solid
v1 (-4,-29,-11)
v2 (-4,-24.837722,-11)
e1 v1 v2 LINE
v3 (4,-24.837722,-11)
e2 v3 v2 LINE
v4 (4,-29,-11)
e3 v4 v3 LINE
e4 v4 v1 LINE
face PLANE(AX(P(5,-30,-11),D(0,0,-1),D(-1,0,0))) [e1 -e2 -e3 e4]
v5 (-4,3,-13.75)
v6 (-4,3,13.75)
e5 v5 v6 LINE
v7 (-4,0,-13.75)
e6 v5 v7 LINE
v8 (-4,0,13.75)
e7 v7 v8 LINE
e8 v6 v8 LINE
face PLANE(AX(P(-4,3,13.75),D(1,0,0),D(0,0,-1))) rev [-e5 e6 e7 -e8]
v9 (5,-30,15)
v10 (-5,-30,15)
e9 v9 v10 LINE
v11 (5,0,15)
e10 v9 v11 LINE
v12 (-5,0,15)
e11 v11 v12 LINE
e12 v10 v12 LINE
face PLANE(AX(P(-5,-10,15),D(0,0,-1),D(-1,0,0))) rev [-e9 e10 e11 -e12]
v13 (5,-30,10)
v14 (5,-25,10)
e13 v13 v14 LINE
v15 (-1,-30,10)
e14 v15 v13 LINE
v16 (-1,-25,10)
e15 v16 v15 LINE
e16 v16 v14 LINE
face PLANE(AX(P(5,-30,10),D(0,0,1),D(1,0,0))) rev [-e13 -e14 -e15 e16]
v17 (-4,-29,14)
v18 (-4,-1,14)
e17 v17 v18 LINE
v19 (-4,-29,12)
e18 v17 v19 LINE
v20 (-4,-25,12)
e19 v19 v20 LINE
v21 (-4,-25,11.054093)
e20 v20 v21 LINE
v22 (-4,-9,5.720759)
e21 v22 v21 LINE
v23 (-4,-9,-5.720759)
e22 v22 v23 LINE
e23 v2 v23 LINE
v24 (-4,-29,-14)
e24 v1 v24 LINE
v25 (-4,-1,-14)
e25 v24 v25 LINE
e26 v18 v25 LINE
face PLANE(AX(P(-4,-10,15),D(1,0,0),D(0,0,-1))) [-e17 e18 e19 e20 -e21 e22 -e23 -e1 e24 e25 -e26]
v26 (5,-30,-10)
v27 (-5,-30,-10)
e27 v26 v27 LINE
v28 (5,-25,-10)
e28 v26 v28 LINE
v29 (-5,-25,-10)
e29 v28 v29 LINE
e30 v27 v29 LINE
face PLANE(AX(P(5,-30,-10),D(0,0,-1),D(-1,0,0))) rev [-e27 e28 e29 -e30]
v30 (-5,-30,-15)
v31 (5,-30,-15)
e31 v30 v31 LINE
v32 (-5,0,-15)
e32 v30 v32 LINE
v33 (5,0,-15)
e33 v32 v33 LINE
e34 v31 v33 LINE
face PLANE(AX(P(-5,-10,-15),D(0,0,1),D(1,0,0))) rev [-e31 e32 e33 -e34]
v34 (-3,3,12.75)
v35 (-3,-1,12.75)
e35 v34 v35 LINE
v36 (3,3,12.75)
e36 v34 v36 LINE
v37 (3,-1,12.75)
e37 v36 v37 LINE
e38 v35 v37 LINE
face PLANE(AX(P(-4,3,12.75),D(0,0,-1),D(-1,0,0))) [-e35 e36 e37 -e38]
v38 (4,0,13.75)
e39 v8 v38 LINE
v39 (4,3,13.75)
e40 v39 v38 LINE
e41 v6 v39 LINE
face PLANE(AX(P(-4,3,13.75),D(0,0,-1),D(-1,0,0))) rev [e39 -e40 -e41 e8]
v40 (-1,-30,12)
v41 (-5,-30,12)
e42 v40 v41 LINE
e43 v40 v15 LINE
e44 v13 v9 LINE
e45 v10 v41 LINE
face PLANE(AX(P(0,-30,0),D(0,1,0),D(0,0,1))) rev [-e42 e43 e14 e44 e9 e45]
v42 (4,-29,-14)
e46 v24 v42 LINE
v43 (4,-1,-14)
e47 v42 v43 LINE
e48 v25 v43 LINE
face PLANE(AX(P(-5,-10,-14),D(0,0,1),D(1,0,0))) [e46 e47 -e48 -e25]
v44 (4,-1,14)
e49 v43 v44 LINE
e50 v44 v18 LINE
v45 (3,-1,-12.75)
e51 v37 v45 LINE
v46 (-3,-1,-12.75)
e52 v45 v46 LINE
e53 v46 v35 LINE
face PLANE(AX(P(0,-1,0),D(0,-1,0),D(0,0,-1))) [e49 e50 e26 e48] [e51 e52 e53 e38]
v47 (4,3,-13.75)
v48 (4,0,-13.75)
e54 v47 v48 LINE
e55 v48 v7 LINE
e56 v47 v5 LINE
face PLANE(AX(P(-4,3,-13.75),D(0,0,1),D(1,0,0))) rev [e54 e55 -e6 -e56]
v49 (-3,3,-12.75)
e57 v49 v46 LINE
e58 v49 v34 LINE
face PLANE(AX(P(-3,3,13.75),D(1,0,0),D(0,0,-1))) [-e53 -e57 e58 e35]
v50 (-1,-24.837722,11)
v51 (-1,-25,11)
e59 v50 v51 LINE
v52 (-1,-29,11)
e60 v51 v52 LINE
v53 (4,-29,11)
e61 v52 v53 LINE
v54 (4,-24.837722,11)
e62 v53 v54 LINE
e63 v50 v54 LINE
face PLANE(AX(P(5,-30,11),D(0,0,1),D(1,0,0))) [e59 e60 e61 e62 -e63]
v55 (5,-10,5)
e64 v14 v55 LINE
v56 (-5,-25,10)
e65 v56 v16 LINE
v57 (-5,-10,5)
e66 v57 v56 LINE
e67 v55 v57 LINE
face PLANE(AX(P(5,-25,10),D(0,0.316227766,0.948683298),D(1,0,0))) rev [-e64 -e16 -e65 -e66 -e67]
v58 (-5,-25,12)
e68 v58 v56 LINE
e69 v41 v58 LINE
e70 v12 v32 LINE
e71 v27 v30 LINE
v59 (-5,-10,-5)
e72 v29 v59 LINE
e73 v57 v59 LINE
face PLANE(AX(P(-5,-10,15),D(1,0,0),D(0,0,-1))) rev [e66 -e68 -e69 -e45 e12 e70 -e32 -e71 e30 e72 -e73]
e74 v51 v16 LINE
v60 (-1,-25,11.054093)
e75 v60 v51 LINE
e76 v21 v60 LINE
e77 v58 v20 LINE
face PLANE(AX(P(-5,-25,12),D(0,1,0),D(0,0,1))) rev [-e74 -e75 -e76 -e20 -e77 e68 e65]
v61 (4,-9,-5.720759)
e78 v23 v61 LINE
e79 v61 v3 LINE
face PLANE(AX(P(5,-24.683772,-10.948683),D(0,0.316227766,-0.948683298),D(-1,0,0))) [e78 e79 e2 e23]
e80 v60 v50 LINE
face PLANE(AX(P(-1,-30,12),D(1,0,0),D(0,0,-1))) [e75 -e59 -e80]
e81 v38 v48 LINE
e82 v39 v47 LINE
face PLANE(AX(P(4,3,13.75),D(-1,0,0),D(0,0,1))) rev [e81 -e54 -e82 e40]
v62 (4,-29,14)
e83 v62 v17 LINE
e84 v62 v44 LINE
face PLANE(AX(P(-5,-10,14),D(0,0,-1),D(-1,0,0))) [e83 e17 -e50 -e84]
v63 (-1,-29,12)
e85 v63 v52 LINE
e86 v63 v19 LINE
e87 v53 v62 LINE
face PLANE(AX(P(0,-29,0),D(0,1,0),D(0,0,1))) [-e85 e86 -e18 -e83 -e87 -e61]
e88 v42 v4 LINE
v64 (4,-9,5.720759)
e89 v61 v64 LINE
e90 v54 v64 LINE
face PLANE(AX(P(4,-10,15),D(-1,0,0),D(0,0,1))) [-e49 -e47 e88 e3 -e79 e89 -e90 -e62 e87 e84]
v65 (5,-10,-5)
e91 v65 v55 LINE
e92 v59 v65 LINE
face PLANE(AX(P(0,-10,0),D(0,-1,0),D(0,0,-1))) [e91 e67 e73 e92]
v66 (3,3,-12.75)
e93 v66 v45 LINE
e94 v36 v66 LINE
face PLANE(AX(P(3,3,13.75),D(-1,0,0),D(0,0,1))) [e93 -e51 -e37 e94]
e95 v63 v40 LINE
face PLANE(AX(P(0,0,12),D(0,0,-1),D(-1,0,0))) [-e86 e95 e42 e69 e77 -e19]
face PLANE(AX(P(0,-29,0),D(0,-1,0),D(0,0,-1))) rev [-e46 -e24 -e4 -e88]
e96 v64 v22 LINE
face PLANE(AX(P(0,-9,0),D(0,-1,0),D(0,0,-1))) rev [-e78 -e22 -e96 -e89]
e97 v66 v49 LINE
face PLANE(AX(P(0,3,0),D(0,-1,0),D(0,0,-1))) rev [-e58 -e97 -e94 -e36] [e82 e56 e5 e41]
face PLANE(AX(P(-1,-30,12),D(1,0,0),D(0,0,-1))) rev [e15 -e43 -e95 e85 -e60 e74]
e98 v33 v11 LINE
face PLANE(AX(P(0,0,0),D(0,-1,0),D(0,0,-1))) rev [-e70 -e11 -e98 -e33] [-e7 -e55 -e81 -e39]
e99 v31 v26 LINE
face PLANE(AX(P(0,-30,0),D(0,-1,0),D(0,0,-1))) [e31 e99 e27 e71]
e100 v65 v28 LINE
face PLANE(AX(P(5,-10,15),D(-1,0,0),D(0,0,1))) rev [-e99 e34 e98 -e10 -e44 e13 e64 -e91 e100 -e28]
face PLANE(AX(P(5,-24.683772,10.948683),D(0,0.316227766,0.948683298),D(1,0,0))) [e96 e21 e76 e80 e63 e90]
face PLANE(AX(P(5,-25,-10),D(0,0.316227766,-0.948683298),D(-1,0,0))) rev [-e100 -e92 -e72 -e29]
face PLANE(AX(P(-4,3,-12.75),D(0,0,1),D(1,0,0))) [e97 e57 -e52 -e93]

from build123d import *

# Parameters (mm, degrees)
SKETCH1_W           = 8
SKETCH1_H           = 27.5
BOSS_EXTRUDE1_DEPTH = 3
SKETCH2_W           = 10
SKETCH2_H           = 30
BOSS_EXTRUDE2_DEPTH = 10
SKETCH4_W           = 10
SKETCH4_H           = 5
BOSS_EXTRUDE3_DEPTH = 20
CHAMFER2_SIZE       = 5
CHAMFER2_SIZE2      = 15
SKETCH7_W           = 4
SKETCH7_H           = 5
CUT_EXTRUDE2_DEPTH  = 2
SHELL1_START        = -4
SHELL1_DEPTH        = 8
SHELL1_START_2      = -3
SHELL1_2_OUTLINE_W  = 4
SHELL1_2_OUTLINE_H  = 25.5
SHELL1_2_DEPTH      = 6
SHELL1_START_3      = -1
SHELL1_3_DEPTH      = 5


# Read off the part's stored shape, not the designer's step: Shell1
with BuildPart() as part:
    # Sketch1 → Boss-Extrude1 (new body)
    with BuildSketch(Plane(origin=(0, 0, 0), x_dir=(1, 0, 0), z_dir=(0, 1, 0))):
        Rectangle(SKETCH1_W, SKETCH1_H)
    extrude(amount=BOSS_EXTRUDE1_DEPTH)

    # Sketch2 → Boss-Extrude2 (add)
    with BuildSketch(Plane.XZ):
        Rectangle(SKETCH2_W, SKETCH2_H)
    extrude(amount=BOSS_EXTRUDE2_DEPTH)

    # Sketch4 → Boss-Extrude3 (add)
    with BuildSketch(Plane.XZ.offset(10)):
        with Locations((0, 12.5)):
            Rectangle(SKETCH4_W, SKETCH4_H)
        with Locations((0, -12.5)):
            Rectangle(SKETCH4_W, SKETCH4_H)
    extrude(amount=BOSS_EXTRUDE3_DEPTH)

    # Chamfer2
    chamfer2_edges = [part.edges().sort_by_distance(p)[0] for p in [
        (0, -10, 10),
        (0, -10, -10),
    ]]
    chamfer2_side = [part.faces().sort_by_distance(p)[0] for p in [
        (0, -10, 0),
    ]]
    chamfer(chamfer2_edges, length=CHAMFER2_SIZE, length2=CHAMFER2_SIZE2, reference=chamfer2_side[0])

    # Sketch7 → Cut-Extrude2 (cut)
    with BuildSketch(Plane(origin=(0, 0, 10), x_dir=(-1, 0, 0), z_dir=(0, 0, -1))):
        with Locations((3, -27.5)):
            Rectangle(SKETCH7_W, SKETCH7_H)
    extrude(amount=-CUT_EXTRUDE2_DEPTH, mode=Mode.SUBTRACT)

    # Shell1 outline → Shell1 (cut)
    with BuildSketch(Plane.YZ.offset(SHELL1_START)):
        Polygon((-9, 5.72075922), (-9, -5.72075922), (-24.83772234, -11), (-29, -11), (-29, -14), (-1, -14), (-1, 14), (-29, 14), (-29, 11), (-25, 11), (-25, 11.054092553), align=None)
    extrude(amount=SHELL1_DEPTH, mode=Mode.SUBTRACT)

    # Shell1 2 outline → Shell1 2 (cut)
    with BuildSketch(Plane.YZ.offset(SHELL1_START_2)):
        with Locations((1, 0)):
            Rectangle(SHELL1_2_OUTLINE_W, SHELL1_2_OUTLINE_H)
    extrude(amount=SHELL1_2_DEPTH, mode=Mode.SUBTRACT)

    # Shell1 3 outline → Shell1 3 (cut)
    with BuildSketch(Plane.YZ.offset(SHELL1_START_3)):
        Polygon((-25, 11), (-24.83772234, 11), (-25, 11.054092553), align=None)
    extrude(amount=SHELL1_3_DEPTH, mode=Mode.SUBTRACT)


solid = part.part
